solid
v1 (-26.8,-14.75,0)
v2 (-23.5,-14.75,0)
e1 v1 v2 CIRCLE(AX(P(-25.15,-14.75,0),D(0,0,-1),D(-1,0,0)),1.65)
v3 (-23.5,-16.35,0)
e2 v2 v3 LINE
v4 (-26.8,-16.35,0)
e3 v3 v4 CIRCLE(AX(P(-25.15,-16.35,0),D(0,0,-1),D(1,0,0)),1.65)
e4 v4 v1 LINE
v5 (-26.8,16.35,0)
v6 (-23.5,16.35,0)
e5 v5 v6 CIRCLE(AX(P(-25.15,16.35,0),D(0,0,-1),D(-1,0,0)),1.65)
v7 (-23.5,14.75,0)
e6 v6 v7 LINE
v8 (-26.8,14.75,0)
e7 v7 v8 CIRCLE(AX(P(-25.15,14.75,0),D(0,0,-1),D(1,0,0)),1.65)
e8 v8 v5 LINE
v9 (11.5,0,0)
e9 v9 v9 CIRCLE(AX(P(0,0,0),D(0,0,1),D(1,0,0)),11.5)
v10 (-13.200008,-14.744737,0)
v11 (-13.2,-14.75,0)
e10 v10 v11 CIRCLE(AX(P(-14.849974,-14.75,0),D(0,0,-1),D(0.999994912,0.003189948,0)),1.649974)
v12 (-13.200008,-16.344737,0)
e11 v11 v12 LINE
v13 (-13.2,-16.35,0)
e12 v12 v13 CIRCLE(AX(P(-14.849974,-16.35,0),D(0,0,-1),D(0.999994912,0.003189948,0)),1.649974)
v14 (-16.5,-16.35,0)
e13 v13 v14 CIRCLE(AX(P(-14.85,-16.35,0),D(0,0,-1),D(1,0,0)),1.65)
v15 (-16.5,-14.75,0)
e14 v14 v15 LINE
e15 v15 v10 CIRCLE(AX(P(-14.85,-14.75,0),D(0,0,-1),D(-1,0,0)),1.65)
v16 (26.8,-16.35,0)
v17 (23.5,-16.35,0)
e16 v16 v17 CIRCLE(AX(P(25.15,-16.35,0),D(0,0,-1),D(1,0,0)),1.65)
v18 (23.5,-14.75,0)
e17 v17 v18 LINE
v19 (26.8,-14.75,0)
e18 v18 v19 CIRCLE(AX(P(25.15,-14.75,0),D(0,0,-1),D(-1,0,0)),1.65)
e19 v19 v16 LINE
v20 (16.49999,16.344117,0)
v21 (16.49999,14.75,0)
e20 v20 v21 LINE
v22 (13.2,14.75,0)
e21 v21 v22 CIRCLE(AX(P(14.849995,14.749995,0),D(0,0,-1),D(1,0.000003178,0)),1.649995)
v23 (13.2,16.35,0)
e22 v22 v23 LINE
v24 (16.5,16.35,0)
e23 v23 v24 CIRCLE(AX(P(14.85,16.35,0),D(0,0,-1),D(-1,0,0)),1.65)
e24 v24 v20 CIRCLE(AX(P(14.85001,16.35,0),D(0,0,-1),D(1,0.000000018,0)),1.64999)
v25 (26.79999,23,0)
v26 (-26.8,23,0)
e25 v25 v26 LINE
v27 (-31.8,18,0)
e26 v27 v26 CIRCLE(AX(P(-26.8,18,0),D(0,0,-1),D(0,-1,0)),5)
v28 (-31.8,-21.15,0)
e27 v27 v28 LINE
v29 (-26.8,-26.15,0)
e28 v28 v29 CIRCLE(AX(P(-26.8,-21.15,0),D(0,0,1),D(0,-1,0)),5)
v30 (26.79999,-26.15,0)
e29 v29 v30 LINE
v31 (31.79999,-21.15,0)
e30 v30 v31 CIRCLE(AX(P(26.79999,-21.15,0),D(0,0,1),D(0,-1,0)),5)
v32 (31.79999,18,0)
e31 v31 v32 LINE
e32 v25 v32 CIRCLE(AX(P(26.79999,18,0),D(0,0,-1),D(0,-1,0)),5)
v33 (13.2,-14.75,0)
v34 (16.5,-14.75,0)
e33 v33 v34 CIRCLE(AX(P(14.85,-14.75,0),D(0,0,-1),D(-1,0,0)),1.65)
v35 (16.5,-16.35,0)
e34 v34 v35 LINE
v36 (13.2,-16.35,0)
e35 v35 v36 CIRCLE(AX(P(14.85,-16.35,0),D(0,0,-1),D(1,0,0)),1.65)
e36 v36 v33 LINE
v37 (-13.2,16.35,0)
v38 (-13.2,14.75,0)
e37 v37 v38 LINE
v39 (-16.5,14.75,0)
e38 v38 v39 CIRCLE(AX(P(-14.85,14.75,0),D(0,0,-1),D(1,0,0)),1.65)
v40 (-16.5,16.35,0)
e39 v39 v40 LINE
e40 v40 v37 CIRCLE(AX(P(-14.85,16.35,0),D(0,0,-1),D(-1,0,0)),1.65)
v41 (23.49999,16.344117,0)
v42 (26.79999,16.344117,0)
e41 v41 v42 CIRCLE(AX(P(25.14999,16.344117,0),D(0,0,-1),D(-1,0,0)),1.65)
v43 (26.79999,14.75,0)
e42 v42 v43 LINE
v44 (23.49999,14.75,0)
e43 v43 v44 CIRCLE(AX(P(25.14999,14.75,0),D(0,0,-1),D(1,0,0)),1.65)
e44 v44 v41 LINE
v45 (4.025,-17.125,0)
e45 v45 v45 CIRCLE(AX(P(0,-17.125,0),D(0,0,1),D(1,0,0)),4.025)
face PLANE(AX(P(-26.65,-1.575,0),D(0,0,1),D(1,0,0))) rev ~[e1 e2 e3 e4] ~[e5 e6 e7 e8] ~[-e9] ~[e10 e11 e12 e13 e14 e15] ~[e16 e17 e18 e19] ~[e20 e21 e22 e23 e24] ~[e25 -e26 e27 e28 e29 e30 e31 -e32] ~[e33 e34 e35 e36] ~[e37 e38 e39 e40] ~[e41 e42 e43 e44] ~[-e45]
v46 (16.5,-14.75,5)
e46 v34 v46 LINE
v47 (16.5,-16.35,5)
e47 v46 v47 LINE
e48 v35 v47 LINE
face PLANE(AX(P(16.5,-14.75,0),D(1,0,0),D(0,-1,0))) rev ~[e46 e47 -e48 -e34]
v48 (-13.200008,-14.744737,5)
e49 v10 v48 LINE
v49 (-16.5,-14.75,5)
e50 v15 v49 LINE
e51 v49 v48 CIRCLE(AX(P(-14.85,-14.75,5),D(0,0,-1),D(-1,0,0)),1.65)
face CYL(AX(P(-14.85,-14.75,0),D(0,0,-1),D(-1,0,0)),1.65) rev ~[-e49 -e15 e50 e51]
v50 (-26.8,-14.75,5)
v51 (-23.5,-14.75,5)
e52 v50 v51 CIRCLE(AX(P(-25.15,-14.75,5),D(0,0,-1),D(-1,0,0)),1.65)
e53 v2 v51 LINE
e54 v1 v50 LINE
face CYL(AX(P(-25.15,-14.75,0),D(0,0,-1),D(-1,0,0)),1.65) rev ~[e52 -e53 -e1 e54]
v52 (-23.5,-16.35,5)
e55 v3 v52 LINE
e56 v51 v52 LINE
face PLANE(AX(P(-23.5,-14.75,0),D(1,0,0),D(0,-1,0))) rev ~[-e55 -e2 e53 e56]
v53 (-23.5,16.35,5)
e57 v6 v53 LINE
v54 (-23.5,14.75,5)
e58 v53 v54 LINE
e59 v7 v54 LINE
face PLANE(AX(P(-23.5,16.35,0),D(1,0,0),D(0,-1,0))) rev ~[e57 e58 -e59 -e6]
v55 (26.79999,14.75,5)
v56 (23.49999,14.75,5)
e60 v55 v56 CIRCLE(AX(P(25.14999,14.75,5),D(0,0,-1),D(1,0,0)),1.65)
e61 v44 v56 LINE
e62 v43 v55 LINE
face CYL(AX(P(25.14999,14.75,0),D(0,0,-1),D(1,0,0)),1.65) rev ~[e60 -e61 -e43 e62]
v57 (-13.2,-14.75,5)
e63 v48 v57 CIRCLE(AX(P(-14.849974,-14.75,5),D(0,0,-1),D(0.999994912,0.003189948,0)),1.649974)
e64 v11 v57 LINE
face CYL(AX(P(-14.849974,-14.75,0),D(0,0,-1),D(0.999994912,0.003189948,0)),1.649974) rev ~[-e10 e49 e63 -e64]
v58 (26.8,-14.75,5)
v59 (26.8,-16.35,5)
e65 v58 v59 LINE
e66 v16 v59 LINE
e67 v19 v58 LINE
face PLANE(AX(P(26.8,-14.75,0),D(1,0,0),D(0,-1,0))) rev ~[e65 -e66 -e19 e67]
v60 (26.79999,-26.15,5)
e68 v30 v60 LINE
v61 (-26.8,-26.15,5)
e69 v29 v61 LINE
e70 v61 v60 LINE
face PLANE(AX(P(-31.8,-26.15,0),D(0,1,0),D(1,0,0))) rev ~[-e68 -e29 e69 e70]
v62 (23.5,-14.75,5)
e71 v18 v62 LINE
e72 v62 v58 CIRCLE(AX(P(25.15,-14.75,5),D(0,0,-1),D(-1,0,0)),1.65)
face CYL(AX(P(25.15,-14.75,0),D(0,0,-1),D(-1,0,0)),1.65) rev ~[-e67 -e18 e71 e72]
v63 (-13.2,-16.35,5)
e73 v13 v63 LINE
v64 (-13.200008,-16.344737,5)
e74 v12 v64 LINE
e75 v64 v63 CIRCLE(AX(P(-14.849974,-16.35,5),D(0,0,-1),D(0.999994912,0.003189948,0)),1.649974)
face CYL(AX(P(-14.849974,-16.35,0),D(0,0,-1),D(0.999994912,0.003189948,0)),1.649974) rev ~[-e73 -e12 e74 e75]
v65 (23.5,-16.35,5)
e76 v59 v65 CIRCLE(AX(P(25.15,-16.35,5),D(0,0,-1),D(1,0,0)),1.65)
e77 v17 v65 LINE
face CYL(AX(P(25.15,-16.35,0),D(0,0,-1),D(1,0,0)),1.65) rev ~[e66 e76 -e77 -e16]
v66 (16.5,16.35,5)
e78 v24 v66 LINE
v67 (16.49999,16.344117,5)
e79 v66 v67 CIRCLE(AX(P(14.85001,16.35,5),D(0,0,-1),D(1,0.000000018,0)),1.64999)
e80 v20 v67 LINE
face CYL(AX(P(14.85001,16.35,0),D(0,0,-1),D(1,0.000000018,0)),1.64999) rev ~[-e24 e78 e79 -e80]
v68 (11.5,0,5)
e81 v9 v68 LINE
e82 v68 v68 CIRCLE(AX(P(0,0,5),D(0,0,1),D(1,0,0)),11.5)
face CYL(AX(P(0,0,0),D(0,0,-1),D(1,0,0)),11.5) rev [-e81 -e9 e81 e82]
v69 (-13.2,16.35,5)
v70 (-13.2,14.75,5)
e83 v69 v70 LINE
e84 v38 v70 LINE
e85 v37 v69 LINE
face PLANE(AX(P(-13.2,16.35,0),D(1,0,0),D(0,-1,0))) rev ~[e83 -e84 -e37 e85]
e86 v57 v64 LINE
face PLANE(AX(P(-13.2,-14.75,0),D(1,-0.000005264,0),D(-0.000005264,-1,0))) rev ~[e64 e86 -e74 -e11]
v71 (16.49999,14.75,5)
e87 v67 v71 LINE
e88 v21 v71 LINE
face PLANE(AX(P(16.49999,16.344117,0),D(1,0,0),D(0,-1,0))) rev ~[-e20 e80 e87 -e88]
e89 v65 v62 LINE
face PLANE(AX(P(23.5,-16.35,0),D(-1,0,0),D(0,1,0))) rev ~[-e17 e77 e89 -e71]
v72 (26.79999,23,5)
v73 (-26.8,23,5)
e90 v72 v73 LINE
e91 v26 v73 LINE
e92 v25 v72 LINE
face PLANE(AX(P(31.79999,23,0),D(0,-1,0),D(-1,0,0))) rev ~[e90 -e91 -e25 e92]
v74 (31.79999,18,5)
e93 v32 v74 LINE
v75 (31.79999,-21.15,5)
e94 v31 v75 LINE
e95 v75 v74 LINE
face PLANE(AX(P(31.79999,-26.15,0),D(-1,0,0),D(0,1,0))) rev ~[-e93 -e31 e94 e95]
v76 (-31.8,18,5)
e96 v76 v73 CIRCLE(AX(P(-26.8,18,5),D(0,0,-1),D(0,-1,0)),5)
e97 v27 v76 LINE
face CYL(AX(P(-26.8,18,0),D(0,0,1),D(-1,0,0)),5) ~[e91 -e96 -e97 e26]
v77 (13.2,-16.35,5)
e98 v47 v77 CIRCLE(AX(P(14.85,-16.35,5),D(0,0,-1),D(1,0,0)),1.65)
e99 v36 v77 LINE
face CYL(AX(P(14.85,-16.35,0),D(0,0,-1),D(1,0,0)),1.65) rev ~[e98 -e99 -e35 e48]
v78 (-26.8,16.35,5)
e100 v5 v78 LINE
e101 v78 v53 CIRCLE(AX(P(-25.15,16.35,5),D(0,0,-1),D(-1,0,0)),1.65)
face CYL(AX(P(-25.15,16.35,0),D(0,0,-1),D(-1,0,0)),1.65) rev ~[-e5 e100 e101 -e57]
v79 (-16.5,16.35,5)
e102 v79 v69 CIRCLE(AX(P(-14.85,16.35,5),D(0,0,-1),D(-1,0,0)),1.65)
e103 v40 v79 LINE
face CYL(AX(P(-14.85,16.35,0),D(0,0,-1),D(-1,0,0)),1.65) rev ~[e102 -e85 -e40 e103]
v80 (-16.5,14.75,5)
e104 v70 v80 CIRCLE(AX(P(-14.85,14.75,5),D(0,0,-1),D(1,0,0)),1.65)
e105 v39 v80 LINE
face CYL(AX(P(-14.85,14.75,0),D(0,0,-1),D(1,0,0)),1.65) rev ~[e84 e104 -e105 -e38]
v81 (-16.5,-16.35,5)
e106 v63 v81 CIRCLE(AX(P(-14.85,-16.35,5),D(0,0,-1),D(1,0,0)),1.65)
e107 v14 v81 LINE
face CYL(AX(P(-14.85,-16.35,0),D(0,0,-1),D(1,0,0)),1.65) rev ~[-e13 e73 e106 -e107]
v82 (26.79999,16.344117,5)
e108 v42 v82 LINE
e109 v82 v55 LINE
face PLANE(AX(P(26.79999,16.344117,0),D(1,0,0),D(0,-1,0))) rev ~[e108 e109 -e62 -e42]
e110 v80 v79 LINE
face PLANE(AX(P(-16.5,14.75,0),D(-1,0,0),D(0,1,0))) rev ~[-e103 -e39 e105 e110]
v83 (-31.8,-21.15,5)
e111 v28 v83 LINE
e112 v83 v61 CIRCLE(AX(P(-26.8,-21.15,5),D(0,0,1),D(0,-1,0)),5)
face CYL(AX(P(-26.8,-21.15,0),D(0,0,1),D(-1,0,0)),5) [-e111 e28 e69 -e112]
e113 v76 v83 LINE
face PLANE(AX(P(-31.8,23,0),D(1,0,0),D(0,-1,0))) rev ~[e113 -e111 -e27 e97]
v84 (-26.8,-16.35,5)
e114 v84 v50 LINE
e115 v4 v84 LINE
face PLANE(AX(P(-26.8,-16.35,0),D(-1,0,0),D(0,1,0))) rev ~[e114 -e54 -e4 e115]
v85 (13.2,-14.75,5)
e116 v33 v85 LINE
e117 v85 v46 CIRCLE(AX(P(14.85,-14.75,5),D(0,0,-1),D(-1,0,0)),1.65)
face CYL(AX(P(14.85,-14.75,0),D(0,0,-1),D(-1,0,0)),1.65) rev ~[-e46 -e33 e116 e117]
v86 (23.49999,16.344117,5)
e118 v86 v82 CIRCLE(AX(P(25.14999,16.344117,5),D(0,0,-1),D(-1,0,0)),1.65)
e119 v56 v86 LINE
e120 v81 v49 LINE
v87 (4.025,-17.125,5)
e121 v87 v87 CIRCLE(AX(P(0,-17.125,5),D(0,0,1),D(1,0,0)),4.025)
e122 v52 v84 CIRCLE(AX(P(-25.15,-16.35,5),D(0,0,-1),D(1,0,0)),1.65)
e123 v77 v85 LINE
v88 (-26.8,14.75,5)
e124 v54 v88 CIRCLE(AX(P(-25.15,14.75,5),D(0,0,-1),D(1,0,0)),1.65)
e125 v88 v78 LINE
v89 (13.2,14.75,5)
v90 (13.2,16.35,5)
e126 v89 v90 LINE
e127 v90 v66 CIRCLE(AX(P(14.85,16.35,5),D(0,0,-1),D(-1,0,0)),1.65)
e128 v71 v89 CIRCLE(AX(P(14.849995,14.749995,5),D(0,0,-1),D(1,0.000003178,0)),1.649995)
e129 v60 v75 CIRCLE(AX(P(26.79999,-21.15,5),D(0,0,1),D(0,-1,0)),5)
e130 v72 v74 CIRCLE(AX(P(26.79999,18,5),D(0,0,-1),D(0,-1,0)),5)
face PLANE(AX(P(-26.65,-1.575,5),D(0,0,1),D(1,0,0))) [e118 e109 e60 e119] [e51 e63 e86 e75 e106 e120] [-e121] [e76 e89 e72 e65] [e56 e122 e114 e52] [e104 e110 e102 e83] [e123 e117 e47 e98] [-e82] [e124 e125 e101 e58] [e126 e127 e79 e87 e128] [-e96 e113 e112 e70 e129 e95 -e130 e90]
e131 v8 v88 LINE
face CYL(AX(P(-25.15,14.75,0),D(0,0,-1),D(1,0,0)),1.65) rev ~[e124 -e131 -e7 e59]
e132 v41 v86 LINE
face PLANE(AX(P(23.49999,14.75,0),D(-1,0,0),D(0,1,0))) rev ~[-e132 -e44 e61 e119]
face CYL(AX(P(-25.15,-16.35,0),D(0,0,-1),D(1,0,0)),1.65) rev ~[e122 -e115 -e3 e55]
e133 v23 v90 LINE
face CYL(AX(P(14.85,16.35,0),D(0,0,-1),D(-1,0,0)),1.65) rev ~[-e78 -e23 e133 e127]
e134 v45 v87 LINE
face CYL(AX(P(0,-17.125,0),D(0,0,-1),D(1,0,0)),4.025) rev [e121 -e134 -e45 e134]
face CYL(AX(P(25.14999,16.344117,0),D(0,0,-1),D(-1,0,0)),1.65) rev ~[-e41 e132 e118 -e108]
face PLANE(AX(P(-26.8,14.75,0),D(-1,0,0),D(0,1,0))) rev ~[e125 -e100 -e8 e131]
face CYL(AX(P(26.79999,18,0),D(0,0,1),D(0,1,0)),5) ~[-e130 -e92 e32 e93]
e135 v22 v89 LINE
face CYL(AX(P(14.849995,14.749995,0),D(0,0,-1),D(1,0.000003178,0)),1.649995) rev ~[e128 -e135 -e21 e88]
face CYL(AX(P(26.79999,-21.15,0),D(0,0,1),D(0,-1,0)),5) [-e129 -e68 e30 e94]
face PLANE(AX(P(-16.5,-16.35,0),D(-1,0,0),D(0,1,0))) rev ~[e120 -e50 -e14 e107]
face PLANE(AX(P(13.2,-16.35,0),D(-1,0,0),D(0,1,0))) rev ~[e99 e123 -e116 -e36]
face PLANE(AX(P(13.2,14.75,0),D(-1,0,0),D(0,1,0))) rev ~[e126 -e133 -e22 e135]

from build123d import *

# Parameters (mm, degrees)
F0_W     = 43
F0_H     = 46
F0_R     = 4.025
F0_R_2   = 11.5
F0_H_2   = 3.15
F1_DEPTH = 5
F2_R     = 5


# Not quite as in the source:
# - ends of sketch curves that miss each other by under 0.0002 mm in the source are joined


with BuildPart() as f1:
    # F0 (on Top) → F1 (new body)
    with BuildSketch(Plane.XY):
        Polygon((-21.5, -23), (-21.5, 23), (-31.8, 23), (-31.8, -26.15), (-21.5, -26.15), align=None)
        with BuildLine():
            ThreePointArc((-23.5, -16.35), (-25.15, -18), (-26.8, -16.35))
            Line((-26.8, -16.35), (-26.8, -14.75))
            ThreePointArc((-26.8, -14.75), (-25.15, -13.1), (-23.5, -14.75))
            Line((-23.5, -14.75), (-23.5, -16.35))
        make_face(mode=Mode.SUBTRACT)
        with BuildLine():
            ThreePointArc((-23.5, 14.75), (-25.15, 13.1), (-26.8, 14.75))
            Line((-26.8, 14.75), (-26.8, 16.35))
            ThreePointArc((-26.8, 16.35), (-25.15, 18), (-23.5, 16.35))
            Line((-23.5, 16.35), (-23.5, 14.75))
        make_face(mode=Mode.SUBTRACT)
        Rectangle(F0_W, F0_H)
        with BuildLine():
            ThreePointArc((-13.2000083949, -16.3447366346), (-13.2000020987, -16.3473683139), (-13.2, -16.35))
            ThreePointArc((-13.2, -16.35), (-14.85, -18), (-16.5, -16.35))
            Line((-16.5, -16.35), (-16.5, -14.75))
            ThreePointArc((-16.5, -14.75), (-14.8526316861, -13.1000020987), (-13.2000083949, -14.7447366346))
            ThreePointArc((-13.2000083949, -14.7447366346), (-13.2000020987, -14.7473683139), (-13.2, -14.75))
            Line((-13.2, -14.75), (-13.2000083949, -16.3447366346))
        make_face(mode=Mode.SUBTRACT)
        with Locations((0, -17.125)):
            Circle(F0_R, mode=Mode.SUBTRACT)
        with BuildLine():
            ThreePointArc((16.5, -16.35), (14.85, -18), (13.2, -16.35))
            Line((13.2, -16.35), (13.2, -14.75))
            ThreePointArc((13.2, -14.75), (14.85, -13.1), (16.5, -14.75))
            Line((16.5, -14.75), (16.5, -16.35))
        make_face(mode=Mode.SUBTRACT)
        with BuildLine():
            ThreePointArc((-16.5, 16.35), (-14.85, 18), (-13.2, 16.35))
            Line((-13.2, 16.35), (-13.2, 14.75))
            ThreePointArc((-13.2, 14.75), (-14.85, 13.1), (-16.5, 14.75))
            Line((-16.5, 14.75), (-16.5, 16.35))
        make_face(mode=Mode.SUBTRACT)
        Circle(F0_R_2, mode=Mode.SUBTRACT)
        with BuildLine():
            ThreePointArc((13.2, 16.35), (14.85, 18), (16.5, 16.35))
            ThreePointArc((16.5, 16.35), (16.4999973784, 16.347058674), (16.4999895135, 16.3441173573))
            Line((16.4999895135, 16.3441173573), (16.4999895135, 14.75))
            ThreePointArc((16.4999895135, 14.75), (14.85, 13.1), (13.2, 14.75))
            Line((13.2, 14.75), (13.2, 16.35))
        make_face(mode=Mode.SUBTRACT)
        with Locations((0, -24.575)):
            Rectangle(F0_W, F0_H_2)
        Polygon((31.7999895135, 23), (21.5, 23), (21.5, -23), (21.5, -26.15), (31.7999895135, -26.15), align=None)
        with BuildLine():
            ThreePointArc((26.8, -16.35), (25.15, -18), (23.5, -16.35))
            Line((23.5, -16.35), (23.5, -14.75))
            ThreePointArc((23.5, -14.75), (25.15, -13.1), (26.8, -14.75))
            Line((26.8, -14.75), (26.8, -16.35))
        make_face(mode=Mode.SUBTRACT)
        with BuildLine():
            ThreePointArc((26.7999895135, 14.75), (25.1499895135, 13.1), (23.4999895135, 14.75))
            Line((23.4999895135, 14.75), (23.4999895135, 16.3441173573))
            ThreePointArc((23.4999895135, 16.3441173573), (25.1499895135, 17.9941173573), (26.7999895135, 16.3441173573))
            Line((26.7999895135, 16.3441173573), (26.7999895135, 14.75))
        make_face(mode=Mode.SUBTRACT)
    extrude(amount=F1_DEPTH)

    # F2
    f2_edges = [f1.edges().sort_by_distance(p)[0] for p in [
        (-31.8, 23, 2.5),
        (-31.8, -26.15, 2.5),
        (31.79999, -26.15, 2.5),
        (31.79999, 23, 2.5),
    ]]
    fillet(f2_edges, radius=F2_R)


solid = f1.part
